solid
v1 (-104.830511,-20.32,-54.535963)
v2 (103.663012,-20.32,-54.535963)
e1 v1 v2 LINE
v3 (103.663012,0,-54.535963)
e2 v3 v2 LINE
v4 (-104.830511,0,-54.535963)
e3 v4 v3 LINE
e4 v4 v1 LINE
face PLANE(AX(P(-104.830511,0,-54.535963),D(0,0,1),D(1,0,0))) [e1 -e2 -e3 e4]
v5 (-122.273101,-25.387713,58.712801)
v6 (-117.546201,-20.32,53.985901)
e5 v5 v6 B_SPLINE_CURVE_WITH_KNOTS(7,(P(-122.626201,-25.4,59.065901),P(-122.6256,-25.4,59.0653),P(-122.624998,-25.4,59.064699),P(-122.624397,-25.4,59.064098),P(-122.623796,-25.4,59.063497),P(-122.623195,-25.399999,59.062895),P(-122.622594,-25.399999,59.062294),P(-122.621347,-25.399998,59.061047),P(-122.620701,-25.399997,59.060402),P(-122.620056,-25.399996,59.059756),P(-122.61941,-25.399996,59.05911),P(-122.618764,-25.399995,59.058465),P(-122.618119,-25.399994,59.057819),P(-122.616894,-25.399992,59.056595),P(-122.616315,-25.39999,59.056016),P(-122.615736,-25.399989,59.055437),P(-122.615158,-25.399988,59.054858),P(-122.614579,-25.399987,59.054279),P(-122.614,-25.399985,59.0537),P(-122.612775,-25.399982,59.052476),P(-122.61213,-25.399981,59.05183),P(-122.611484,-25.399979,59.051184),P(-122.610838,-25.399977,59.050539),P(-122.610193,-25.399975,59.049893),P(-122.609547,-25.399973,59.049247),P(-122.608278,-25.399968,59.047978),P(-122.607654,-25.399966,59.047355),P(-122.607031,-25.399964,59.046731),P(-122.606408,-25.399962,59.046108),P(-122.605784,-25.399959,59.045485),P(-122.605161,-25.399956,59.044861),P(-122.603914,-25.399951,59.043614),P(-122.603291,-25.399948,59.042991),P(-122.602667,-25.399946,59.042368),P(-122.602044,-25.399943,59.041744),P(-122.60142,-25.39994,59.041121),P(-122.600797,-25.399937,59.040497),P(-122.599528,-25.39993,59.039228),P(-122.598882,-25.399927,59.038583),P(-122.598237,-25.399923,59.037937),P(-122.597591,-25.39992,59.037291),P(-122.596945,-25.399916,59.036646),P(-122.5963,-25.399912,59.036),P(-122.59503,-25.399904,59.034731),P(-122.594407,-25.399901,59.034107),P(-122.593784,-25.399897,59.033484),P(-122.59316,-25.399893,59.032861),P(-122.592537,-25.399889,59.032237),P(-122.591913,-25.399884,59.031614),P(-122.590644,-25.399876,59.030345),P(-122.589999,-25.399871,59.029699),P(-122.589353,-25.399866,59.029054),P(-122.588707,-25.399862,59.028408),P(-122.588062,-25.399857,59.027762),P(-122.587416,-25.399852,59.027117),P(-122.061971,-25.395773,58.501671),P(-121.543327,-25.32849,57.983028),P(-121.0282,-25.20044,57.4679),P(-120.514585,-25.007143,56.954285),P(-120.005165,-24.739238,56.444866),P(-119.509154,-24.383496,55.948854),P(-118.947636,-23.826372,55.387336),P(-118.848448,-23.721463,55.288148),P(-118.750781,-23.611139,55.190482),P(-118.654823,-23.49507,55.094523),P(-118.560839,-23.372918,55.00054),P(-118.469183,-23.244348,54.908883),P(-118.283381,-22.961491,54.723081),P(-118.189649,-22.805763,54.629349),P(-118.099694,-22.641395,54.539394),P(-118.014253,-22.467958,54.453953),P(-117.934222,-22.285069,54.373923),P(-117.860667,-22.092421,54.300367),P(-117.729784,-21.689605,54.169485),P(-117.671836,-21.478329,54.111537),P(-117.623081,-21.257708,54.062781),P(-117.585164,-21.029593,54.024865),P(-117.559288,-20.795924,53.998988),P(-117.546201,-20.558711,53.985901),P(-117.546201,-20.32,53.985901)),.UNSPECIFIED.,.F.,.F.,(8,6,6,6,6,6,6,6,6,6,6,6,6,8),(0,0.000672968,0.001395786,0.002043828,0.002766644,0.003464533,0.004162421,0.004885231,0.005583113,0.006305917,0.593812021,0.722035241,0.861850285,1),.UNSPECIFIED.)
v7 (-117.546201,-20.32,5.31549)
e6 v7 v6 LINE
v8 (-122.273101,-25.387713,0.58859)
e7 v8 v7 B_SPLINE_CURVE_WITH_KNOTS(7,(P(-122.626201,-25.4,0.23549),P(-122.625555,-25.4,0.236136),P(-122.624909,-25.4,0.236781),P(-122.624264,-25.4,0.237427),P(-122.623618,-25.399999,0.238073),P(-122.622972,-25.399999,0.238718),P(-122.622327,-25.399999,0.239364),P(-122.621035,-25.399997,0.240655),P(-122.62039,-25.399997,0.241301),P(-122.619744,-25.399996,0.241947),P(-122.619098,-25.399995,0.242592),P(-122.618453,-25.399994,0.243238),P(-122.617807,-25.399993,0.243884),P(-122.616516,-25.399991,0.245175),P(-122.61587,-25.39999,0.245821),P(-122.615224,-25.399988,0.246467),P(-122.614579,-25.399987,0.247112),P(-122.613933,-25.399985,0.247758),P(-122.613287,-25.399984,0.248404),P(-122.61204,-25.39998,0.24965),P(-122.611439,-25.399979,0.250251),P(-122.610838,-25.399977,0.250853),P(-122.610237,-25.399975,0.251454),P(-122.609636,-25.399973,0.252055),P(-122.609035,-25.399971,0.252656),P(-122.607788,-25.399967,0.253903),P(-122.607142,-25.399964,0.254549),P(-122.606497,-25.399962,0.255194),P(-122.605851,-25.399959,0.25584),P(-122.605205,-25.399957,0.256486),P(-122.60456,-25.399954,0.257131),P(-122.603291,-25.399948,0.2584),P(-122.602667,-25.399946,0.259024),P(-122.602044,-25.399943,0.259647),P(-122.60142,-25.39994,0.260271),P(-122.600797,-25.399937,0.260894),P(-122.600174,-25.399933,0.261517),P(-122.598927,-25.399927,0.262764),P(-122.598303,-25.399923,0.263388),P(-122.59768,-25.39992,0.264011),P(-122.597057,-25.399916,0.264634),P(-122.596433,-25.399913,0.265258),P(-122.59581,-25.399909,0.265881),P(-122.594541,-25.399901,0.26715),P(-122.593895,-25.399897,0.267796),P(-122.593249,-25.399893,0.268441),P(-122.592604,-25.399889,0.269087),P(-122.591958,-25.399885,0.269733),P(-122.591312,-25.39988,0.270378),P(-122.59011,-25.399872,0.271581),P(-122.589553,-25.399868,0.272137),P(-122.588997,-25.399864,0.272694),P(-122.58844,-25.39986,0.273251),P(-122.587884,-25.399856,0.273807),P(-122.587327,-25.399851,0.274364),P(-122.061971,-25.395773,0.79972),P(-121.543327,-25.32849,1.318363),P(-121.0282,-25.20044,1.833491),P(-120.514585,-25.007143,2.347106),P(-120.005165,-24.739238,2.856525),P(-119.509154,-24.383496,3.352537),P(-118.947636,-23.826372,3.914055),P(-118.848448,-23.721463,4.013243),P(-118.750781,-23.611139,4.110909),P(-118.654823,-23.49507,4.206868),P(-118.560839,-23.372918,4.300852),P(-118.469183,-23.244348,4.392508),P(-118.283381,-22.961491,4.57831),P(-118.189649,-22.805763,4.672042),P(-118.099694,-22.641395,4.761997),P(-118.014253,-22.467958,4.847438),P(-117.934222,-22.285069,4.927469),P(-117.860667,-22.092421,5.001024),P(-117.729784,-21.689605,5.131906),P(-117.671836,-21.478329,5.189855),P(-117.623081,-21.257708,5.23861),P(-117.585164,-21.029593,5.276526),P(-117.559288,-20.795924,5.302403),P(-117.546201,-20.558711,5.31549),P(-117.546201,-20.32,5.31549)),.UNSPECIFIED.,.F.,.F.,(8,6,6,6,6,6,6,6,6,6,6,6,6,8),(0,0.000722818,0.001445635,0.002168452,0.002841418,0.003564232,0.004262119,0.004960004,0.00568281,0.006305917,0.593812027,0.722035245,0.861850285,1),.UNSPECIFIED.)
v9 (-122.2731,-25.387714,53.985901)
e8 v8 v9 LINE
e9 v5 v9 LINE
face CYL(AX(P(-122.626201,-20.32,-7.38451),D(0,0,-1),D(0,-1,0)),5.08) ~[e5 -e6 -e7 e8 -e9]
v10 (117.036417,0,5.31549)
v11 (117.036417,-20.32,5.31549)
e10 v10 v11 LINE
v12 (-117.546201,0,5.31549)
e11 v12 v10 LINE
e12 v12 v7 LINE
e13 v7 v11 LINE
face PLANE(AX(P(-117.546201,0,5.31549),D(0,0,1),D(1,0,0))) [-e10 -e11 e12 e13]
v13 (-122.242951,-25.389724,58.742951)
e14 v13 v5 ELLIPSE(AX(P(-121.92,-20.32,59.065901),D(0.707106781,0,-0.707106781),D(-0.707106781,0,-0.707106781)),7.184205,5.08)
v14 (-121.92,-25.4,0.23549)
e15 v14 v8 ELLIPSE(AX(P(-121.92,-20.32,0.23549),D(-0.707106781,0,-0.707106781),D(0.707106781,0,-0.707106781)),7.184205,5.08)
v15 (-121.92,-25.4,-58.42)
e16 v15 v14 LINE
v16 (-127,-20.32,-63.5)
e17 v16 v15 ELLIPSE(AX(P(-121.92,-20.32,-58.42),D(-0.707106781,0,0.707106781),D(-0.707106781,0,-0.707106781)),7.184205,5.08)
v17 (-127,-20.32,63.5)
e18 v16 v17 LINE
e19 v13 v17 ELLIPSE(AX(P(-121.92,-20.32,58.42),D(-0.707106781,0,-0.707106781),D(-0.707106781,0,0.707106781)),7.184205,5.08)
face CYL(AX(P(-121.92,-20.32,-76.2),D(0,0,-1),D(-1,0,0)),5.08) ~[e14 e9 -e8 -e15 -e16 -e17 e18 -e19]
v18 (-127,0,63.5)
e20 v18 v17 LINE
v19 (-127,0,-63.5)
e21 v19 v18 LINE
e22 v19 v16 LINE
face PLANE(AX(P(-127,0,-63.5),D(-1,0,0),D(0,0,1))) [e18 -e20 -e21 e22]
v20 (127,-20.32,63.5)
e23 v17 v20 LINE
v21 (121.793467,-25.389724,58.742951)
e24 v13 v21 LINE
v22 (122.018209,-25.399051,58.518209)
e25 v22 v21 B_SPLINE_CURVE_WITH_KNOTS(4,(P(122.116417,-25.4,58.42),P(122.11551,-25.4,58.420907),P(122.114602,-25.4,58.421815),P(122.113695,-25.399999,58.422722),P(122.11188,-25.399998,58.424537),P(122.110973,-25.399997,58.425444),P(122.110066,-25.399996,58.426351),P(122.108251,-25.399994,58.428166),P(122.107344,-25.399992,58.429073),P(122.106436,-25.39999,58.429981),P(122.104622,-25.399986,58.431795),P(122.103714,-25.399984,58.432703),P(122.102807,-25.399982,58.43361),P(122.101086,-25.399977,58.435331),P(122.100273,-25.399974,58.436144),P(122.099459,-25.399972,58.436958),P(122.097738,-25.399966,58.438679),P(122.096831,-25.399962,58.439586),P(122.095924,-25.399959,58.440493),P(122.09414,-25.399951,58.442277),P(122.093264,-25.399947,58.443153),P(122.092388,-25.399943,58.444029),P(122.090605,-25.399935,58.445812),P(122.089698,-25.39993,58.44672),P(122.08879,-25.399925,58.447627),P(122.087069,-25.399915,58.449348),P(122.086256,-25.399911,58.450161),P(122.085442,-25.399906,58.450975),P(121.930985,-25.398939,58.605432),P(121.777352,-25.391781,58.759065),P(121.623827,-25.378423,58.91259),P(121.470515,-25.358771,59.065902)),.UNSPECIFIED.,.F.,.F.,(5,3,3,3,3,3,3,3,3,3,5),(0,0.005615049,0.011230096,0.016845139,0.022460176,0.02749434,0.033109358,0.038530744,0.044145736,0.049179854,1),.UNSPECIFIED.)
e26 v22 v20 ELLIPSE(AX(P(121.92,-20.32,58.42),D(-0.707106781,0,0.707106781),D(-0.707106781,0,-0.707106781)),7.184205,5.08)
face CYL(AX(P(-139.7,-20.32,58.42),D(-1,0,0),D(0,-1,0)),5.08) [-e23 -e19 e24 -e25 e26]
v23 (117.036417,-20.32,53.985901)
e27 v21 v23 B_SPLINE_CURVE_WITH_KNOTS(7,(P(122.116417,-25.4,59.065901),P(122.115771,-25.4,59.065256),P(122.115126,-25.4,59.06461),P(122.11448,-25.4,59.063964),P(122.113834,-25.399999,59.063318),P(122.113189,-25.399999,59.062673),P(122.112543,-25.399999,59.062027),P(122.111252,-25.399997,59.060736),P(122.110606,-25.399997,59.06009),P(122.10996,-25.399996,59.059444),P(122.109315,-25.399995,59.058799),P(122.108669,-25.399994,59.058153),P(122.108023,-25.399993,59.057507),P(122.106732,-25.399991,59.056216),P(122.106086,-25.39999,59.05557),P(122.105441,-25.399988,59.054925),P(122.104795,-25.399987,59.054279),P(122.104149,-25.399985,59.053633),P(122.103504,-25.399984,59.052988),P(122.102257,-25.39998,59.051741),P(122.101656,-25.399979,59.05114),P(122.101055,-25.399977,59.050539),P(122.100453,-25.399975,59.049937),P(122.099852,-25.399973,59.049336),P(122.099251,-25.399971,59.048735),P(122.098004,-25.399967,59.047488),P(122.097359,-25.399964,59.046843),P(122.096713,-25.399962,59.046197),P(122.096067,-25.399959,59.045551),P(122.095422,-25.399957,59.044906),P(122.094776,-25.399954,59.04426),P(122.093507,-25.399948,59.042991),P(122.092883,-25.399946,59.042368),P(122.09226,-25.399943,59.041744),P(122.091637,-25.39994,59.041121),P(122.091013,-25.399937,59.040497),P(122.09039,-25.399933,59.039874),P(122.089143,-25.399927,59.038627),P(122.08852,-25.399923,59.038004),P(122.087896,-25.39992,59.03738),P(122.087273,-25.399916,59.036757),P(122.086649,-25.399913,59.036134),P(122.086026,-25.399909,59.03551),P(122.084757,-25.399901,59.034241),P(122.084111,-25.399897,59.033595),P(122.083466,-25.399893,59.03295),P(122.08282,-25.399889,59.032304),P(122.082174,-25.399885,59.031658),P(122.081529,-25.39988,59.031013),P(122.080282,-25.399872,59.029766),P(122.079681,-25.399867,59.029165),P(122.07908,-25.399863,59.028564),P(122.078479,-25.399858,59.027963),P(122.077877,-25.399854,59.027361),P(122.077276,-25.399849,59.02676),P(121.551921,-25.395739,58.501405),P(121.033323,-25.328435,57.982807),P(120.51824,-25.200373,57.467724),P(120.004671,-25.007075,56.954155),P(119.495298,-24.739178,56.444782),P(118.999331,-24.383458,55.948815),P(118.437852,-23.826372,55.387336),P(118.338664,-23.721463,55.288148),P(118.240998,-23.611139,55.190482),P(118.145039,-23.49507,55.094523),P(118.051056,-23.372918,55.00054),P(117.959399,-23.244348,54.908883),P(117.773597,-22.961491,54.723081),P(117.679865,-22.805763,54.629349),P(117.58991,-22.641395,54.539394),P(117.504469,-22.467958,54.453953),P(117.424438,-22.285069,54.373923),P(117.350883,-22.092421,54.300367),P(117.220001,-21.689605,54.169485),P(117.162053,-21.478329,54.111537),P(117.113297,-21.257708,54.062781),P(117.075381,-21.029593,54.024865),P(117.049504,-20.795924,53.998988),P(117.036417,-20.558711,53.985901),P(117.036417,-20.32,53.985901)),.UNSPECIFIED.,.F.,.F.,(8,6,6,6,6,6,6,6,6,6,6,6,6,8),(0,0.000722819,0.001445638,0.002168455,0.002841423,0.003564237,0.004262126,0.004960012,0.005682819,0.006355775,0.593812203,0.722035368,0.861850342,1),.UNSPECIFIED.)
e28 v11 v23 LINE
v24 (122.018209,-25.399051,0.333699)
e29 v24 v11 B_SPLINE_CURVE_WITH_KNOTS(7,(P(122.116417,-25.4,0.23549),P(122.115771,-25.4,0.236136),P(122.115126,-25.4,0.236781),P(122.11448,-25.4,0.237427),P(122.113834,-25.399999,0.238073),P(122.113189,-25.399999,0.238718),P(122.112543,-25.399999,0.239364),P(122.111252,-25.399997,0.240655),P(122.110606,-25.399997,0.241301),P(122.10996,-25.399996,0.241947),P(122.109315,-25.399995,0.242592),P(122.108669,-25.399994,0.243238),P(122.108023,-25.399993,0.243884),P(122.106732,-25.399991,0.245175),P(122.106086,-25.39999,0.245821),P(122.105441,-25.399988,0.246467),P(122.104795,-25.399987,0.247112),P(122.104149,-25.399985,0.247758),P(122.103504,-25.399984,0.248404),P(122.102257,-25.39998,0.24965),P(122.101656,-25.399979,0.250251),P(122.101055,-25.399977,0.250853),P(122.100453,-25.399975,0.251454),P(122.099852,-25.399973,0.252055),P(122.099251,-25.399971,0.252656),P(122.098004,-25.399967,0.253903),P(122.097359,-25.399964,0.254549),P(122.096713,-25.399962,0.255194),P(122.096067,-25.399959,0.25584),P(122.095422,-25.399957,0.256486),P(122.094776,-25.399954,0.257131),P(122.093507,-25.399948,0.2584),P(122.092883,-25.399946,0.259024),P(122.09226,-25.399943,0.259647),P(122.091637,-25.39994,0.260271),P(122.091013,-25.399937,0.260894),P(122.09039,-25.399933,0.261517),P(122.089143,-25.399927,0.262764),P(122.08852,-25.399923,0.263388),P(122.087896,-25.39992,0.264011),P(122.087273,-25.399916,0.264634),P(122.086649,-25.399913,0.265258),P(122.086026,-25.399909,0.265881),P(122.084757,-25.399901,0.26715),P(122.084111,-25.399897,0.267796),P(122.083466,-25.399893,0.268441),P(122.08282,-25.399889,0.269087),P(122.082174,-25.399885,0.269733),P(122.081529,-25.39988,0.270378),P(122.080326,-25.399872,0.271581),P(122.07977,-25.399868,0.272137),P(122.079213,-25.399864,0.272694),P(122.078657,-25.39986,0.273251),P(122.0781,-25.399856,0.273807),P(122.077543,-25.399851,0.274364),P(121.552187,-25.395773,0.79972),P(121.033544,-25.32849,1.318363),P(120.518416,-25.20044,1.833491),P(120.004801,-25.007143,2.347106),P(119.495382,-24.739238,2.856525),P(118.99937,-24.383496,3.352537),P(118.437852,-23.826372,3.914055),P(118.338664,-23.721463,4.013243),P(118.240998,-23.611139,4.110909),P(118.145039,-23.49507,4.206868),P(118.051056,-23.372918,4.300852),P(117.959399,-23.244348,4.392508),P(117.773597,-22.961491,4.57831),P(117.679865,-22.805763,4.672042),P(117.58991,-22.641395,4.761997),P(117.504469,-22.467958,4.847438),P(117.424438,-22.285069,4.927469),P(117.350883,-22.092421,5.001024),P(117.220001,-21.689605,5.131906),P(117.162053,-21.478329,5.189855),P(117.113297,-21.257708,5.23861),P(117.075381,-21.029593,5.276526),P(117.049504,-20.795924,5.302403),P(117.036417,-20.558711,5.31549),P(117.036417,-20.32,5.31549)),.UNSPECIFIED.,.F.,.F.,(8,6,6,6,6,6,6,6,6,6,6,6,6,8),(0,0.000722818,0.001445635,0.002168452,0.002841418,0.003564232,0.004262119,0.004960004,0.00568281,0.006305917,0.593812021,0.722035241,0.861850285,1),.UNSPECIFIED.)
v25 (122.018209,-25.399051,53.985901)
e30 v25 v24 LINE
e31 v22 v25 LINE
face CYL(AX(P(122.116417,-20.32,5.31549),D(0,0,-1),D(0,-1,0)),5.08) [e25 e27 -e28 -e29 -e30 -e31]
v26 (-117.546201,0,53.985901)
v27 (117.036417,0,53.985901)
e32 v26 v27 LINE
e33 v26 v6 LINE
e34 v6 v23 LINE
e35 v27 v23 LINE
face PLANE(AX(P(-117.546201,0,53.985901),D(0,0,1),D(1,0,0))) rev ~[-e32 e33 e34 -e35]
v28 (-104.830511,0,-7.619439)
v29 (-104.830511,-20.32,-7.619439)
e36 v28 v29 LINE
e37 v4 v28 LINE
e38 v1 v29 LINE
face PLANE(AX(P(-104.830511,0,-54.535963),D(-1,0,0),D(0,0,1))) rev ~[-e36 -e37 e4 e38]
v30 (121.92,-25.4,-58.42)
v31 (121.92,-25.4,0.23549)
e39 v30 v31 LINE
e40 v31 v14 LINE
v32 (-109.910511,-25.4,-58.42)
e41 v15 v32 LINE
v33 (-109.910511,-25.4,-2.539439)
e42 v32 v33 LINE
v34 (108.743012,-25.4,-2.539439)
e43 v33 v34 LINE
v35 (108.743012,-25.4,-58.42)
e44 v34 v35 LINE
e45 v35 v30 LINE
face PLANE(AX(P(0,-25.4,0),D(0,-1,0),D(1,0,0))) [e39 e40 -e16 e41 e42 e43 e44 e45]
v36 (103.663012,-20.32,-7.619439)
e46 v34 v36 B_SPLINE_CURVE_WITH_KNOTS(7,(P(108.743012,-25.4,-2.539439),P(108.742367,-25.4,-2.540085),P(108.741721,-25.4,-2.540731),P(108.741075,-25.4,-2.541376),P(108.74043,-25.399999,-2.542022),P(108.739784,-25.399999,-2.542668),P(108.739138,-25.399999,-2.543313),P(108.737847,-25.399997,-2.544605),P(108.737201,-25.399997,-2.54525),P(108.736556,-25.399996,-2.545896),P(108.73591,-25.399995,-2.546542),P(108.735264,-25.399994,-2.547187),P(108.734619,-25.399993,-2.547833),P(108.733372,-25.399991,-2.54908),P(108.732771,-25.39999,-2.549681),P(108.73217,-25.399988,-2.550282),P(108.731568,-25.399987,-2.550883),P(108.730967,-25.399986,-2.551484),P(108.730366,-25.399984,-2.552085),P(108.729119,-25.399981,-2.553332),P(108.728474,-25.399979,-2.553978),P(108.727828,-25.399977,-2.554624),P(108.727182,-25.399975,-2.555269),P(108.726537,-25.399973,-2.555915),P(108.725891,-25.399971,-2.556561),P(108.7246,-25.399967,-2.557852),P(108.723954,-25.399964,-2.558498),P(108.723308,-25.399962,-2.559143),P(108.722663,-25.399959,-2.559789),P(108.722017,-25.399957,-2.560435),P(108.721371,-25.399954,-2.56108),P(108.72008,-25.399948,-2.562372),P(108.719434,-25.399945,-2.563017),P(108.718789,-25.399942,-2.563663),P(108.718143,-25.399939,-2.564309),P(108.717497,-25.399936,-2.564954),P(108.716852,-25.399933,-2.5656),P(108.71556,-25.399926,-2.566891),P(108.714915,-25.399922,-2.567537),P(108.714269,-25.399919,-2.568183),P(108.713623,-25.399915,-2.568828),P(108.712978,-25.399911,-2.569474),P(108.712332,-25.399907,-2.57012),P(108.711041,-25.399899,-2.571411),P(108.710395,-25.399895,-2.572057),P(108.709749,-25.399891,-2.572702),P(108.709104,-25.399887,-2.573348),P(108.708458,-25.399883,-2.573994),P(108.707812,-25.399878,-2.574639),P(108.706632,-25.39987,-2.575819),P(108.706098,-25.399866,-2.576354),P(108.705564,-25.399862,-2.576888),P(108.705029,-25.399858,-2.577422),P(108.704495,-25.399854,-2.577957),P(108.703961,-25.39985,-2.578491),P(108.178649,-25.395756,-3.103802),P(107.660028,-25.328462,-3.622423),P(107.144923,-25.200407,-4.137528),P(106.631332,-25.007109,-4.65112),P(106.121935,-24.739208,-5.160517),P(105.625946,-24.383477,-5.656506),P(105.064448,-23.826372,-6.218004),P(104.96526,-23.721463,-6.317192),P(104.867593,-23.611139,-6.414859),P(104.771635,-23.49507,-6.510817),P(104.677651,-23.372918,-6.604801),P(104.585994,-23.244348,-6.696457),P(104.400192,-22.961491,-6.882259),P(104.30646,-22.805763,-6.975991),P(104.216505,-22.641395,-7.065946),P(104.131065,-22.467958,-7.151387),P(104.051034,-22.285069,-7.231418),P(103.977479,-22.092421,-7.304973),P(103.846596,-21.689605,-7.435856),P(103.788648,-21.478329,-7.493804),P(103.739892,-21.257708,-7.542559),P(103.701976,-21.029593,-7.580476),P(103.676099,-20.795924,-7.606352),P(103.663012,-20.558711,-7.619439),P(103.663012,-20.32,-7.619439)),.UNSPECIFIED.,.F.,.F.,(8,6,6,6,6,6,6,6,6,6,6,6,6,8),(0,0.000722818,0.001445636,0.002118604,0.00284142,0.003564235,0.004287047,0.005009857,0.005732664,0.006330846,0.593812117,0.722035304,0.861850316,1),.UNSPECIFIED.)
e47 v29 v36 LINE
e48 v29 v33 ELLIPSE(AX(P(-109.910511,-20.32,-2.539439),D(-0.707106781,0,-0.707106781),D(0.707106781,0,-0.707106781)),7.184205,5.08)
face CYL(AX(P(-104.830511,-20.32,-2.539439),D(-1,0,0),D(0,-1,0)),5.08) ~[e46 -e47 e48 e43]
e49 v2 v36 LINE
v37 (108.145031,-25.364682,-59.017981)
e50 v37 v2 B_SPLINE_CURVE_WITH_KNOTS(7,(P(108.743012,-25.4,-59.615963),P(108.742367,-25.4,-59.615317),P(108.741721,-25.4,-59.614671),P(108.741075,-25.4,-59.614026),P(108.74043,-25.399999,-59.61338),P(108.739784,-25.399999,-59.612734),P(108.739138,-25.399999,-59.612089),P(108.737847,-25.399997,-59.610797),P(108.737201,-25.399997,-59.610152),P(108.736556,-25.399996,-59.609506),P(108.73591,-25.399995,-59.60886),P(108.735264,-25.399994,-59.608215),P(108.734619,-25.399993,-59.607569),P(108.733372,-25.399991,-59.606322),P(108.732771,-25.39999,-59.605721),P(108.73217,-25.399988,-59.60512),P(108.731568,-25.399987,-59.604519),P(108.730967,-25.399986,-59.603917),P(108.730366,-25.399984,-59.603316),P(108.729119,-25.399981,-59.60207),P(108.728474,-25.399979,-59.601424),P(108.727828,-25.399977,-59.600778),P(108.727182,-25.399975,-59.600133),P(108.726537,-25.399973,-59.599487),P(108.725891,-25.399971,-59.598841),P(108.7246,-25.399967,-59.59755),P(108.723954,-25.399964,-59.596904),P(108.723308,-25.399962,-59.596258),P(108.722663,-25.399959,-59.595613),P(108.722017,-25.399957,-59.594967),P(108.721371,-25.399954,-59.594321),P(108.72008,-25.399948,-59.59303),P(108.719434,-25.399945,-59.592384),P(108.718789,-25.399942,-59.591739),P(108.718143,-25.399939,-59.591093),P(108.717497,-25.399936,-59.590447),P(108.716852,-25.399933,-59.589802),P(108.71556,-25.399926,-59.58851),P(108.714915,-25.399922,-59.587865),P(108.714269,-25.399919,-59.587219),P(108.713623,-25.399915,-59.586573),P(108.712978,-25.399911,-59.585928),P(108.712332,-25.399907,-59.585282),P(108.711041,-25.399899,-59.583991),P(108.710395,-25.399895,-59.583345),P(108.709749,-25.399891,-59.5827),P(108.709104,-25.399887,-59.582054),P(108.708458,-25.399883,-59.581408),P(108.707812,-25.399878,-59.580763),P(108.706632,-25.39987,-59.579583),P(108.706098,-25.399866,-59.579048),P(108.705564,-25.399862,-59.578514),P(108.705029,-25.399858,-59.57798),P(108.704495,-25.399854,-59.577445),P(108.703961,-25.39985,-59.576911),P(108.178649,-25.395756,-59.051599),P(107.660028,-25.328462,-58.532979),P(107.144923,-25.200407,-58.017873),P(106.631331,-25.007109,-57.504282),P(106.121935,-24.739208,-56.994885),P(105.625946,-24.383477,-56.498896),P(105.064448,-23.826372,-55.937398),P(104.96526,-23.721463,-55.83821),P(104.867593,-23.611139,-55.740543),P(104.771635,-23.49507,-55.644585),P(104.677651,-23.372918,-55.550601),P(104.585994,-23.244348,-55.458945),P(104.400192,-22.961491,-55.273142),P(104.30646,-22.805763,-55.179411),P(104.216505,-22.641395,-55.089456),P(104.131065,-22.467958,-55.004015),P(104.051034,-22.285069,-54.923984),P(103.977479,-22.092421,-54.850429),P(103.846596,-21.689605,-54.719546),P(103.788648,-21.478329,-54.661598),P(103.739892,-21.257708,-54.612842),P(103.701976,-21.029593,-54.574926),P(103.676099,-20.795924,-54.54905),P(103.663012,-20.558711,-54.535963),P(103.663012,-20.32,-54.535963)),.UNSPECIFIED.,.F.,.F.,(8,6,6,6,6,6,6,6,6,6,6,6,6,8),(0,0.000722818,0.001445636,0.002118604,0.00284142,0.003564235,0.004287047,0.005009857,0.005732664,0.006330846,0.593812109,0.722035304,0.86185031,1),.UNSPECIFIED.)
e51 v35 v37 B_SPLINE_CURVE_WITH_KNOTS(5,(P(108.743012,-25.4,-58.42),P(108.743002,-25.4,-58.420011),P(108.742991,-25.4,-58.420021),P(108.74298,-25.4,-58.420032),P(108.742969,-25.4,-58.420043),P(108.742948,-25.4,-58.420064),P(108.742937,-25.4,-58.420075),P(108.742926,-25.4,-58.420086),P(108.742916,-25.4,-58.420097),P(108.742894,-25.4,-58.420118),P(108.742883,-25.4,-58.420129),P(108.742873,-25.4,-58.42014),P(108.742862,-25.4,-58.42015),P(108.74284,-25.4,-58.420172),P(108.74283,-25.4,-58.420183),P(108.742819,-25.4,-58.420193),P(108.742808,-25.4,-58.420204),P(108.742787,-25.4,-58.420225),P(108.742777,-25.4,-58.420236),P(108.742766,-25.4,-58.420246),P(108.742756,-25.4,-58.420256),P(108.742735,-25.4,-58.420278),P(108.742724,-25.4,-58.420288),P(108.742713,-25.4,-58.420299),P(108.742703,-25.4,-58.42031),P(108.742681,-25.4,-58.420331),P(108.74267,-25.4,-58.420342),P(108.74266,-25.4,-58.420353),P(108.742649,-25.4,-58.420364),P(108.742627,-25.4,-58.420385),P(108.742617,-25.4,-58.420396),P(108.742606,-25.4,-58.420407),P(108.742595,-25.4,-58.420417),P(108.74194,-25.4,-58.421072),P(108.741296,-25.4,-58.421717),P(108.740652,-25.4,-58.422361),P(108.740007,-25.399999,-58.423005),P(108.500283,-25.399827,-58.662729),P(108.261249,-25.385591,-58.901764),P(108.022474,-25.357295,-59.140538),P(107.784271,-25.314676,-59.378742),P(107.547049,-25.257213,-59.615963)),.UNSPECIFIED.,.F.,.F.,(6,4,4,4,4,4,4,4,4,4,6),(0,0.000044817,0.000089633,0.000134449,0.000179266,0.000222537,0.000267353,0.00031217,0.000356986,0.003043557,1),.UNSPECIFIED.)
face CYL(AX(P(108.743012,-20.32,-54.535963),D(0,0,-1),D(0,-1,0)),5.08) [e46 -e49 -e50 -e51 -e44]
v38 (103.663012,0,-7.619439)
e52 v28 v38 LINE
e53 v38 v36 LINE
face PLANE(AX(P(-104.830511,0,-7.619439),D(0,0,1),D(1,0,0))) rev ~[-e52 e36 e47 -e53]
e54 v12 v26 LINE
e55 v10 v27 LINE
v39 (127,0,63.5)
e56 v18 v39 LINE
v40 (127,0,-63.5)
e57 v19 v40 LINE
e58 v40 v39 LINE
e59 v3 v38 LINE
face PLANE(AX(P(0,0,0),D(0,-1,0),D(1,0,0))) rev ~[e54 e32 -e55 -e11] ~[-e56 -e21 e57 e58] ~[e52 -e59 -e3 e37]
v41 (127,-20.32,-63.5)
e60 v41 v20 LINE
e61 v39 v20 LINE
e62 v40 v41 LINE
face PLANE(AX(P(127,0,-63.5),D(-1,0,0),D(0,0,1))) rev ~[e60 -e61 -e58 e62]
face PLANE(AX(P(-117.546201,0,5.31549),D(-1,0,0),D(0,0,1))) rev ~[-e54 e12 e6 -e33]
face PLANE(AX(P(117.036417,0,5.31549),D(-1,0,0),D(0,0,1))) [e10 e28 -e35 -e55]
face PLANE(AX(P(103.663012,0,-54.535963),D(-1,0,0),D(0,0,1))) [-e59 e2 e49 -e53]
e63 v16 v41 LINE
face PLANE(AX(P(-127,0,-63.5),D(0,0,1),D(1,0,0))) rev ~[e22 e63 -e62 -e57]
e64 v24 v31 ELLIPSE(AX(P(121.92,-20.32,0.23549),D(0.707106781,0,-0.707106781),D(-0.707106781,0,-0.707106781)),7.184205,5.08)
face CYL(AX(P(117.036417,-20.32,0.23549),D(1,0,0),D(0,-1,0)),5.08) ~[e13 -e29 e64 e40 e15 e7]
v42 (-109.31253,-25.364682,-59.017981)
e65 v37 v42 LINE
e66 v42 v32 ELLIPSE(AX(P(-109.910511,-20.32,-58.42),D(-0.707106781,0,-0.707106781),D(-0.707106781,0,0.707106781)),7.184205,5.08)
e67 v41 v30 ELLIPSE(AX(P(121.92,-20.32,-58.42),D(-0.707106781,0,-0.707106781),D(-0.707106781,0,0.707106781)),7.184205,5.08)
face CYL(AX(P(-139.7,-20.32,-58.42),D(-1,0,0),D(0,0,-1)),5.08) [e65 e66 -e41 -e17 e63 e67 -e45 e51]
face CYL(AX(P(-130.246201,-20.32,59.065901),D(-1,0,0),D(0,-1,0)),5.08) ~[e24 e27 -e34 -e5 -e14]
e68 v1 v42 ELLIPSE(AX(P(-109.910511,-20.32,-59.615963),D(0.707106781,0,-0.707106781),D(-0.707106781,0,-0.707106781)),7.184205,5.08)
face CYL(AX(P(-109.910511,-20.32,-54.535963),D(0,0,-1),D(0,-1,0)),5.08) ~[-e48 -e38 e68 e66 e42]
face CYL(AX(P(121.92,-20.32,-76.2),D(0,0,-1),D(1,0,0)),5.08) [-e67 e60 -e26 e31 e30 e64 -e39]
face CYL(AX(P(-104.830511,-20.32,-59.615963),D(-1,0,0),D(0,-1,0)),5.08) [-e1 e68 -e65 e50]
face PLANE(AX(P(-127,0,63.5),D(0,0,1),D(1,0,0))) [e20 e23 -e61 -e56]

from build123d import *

# Parameters (mm, degrees)
F0_W         = 254
F0_H         = 127
F2_DEPTH     = 25.4
F1_W         = 234.5826178789
F1_H         = 48.6704111099
F1_W_2       = 208.4935232997
F1_H_2       = 46.9165234827
F3_DEPTH     = 50.8
F4_DEPTH     = 102.87
F5_T1_DEPTH  = 279.4
F5_T3_DEPTH  = 152.4
F5_T5_DEPTH  = 46.9165234827
F5_T7_DEPTH  = 208.4935232997
F5_T9_DEPTH  = 48.6704111099
F5_T11_DEPTH = 234.5826178789
F5_T17_DEPTH = 59.6165234827
F5_T21_DEPTH = 221.1935232997
F5_T28_DEPTH = 59.6165234827
F5_T32_DEPTH = 221.1935232997
F5_T39_DEPTH = 221.1935232997
F5_T43_DEPTH = 59.6165234827
F5_T50_DEPTH = 59.6165234827
F5_T54_DEPTH = 221.1935232997
F5_T61_DEPTH = 61.3704111099
F5_T65_DEPTH = 247.2826178789
F5_T72_DEPTH = 61.3704111099
F5_T76_DEPTH = 247.2826178789
F5_T83_DEPTH = 247.2826178789
F5_T87_DEPTH = 61.3704111099
F5_T94_DEPTH = 61.3704111099
F5_T98_DEPTH = 247.2826178789


# Not quite as in the source:
# - a fillet or chamfer that OpenCascade refuses, or shapes differently, is made with other operations: its cross-section is extruded or revolved along the edge and cut away or added


with BuildPart() as f2:
    # F0 (on Front) → F2 (new body)
    with BuildSketch(Plane.XZ):
        Rectangle(F0_W, F0_H)
    extrude(amount=F2_DEPTH)

    # F1 (on face) → F3 (cut)
    with BuildSketch(Plane.XZ):
        with Locations((-0.2548918128, 29.650695622)):
            Rectangle(F1_W, F1_H)
        with Locations((-0.5837492645, -31.0777008999)):
            Rectangle(F1_W_2, F1_H_2)
    extrude(amount=-F3_DEPTH, mode=Mode.SUBTRACT)

    # F1 (on face) → F4 (cut)
    with BuildSketch(Plane.XZ):
        with Locations((-0.2548918128, 29.650695622)):
            Rectangle(F1_W, F1_H)
        with Locations((-0.5837492645, -31.0777008999)):
            Rectangle(F1_W_2, F1_H_2)
    extrude(amount=F4_DEPTH, mode=Mode.SUBTRACT)

    # F5: fillet of radius 5.08 on 12 edges, made by hand

    # F5_s2 → F5_t1 (cut)
    with BuildSketch(Plane.YZ.offset(-139.7)):
        with BuildLine():
            ThreePointArc((-20.32, -63.5), (-23.9121024484, -62.0121024484), (-25.4, -58.42))
            Line((-25.4, -58.42), (-25.4, -63.5))
            Line((-25.4, -63.5), (-20.32, -63.5))
        make_face()
        with BuildLine():
            ThreePointArc((-25.4, 58.42), (-23.9121024484, 62.0121024484), (-20.32, 63.5))
            Line((-20.32, 63.5), (-25.4, 63.5))
            Line((-25.4, 63.5), (-25.4, 58.42))
        make_face()
    extrude(amount=F5_T1_DEPTH, mode=Mode.SUBTRACT)

    # F5_s4 → F5_t3 (cut)
    with BuildSketch(Plane.XY.offset(-76.2)):
        with BuildLine():
            ThreePointArc((-127, -20.32), (-125.5121024484, -23.9121024484), (-121.92, -25.4))
            Line((-121.92, -25.4), (-127, -25.4))
            Line((-127, -25.4), (-127, -20.32))
        make_face()
        with BuildLine():
            ThreePointArc((127, -20.32), (125.5121024484, -23.9121024484), (121.92, -25.4))
            Line((121.92, -25.4), (127, -25.4))
            Line((127, -25.4), (127, -20.32))
        make_face()
    extrude(amount=F5_T3_DEPTH, mode=Mode.SUBTRACT)

    # F5_s6 → F5_t5 (cut)
    with BuildSketch(Plane.XY.offset(-54.5359626412)):
        with BuildLine():
            ThreePointArc((-109.9105109143, -25.4), (-106.3184084659, -23.9121024484), (-104.8305109143, -20.32))
            Line((-104.8305109143, -20.32), (-104.8305109143, -25.4))
            Line((-104.8305109143, -25.4), (-109.9105109143, -25.4))
        make_face()
        with BuildLine():
            ThreePointArc((108.7430123854, -25.4), (105.1509099369, -23.9121024484), (103.6630123854, -20.32))
            Line((103.6630123854, -20.32), (103.6630123854, -25.4))
            Line((103.6630123854, -25.4), (108.7430123854, -25.4))
        make_face()
    extrude(amount=F5_T5_DEPTH, mode=Mode.SUBTRACT)

    # F5_s8 → F5_t7 (cut)
    with BuildSketch(Plane.YZ.offset(-104.8305109143)):
        with BuildLine():
            ThreePointArc((-25.4, -59.6159626412), (-23.9121024484, -56.0238601928), (-20.32, -54.5359626412))
            Line((-20.32, -54.5359626412), (-25.4, -54.5359626412))
            Line((-25.4, -54.5359626412), (-25.4, -59.6159626412))
        make_face()
        with BuildLine():
            ThreePointArc((-25.4, -2.5394391586), (-23.9121024484, -6.131541607), (-20.32, -7.6194391586))
            Line((-20.32, -7.6194391586), (-25.4, -7.6194391586))
            Line((-25.4, -7.6194391586), (-25.4, -2.5394391586))
        make_face()
    extrude(amount=F5_T7_DEPTH, mode=Mode.SUBTRACT)

    # F5_s10 → F5_t9 (cut)
    with BuildSketch(Plane.XY.offset(5.315490067)):
        with BuildLine():
            ThreePointArc((-122.6262007523, -25.4), (-119.0340983038, -23.9121024484), (-117.5462007523, -20.32))
            Line((-117.5462007523, -20.32), (-117.5462007523, -25.4))
            Line((-117.5462007523, -25.4), (-122.6262007523, -25.4))
        make_face()
        with BuildLine():
            ThreePointArc((122.1164171267, -25.4), (118.5243146782, -23.9121024484), (117.0364171267, -20.32))
            Line((117.0364171267, -20.32), (117.0364171267, -25.4))
            Line((117.0364171267, -25.4), (122.1164171267, -25.4))
        make_face()
    extrude(amount=F5_T9_DEPTH, mode=Mode.SUBTRACT)

    # F5_s12 → F5_t11 (cut)
    with BuildSketch(Plane.YZ.offset(-117.5462007523)):
        with BuildLine():
            ThreePointArc((-25.4, 0.235490067), (-23.9121024484, 3.8275925154), (-20.32, 5.315490067))
            Line((-20.32, 5.315490067), (-25.4, 5.315490067))
            Line((-25.4, 5.315490067), (-25.4, 0.235490067))
        make_face()
        with BuildLine():
            ThreePointArc((-25.4, 59.0659011769), (-23.9121024484, 55.4737987285), (-20.32, 53.9859011769))
            Line((-20.32, 53.9859011769), (-25.4, 53.9859011769))
            Line((-25.4, 53.9859011769), (-25.4, 59.0659011769))
        make_face()
    extrude(amount=F5_T11_DEPTH, mode=Mode.SUBTRACT)


with BuildPart() as f5_tool15:
    # F5_s16 → F5_t17 (new body)
    with BuildSketch(Plane.XY.offset(-67.2359626412)):
        with BuildLine():
            ThreePointArc((-109.9105109143, -25.4), (-106.3184084659, -23.9121024484), (-104.8305109143, -20.32))
            Line((-104.8305109143, -20.32), (-104.8305109143, -25.4))
            Line((-104.8305109143, -25.4), (-109.9105109143, -25.4))
        make_face()
    extrude(amount=F5_T17_DEPTH)

    split(bisect_by=Plane.XY.offset(-54.5359626412), keep=Keep.BOTTOM)


with BuildPart() as f5_tool19:
    # F5_s20 → F5_t21 (new body)
    with BuildSketch(Plane.YZ.offset(103.6630123854)):
        with BuildLine():
            ThreePointArc((-25.4, -59.6159626412), (-23.9121024484, -56.0238601928), (-20.32, -54.5359626412))
            Line((-20.32, -54.5359626412), (-25.4, -54.5359626412))
            Line((-25.4, -54.5359626412), (-25.4, -59.6159626412))
        make_face()
    extrude(amount=-F5_T21_DEPTH)

    split(bisect_by=Plane.YZ.offset(-104.8305109143), keep=Keep.BOTTOM)


with BuildPart() as f5_tool15_1:
    add(f5_tool15.part)

    # F5_t23: intersect F5_tool19
    add(f5_tool19.part, mode=Mode.INTERSECT)


with BuildPart() as f2_1:
    add(f2.part)

    # F5_t13: cut F5_tool15
    add(f5_tool15_1.part, mode=Mode.SUBTRACT)


with BuildPart() as f5_tool26:
    # F5_s27 → F5_t28 (new body)
    with BuildSketch(Plane.XY.offset(-54.5359626412)):
        with BuildLine():
            ThreePointArc((-109.9105109143, -25.4), (-106.3184084659, -23.9121024484), (-104.8305109143, -20.32))
            Line((-104.8305109143, -20.32), (-104.8305109143, -25.4))
            Line((-104.8305109143, -25.4), (-109.9105109143, -25.4))
        make_face()
    extrude(amount=F5_T28_DEPTH)

    split(bisect_by=Plane.XY.offset(-7.6194391586), keep=Keep.TOP)


with BuildPart() as f5_tool30:
    # F5_s31 → F5_t32 (new body)
    with BuildSketch(Plane.YZ.offset(-117.5305109143)):
        with BuildLine():
            ThreePointArc((-25.4, -2.5394391586), (-23.9121024484, -6.131541607), (-20.32, -7.6194391586))
            Line((-20.32, -7.6194391586), (-25.4, -7.6194391586))
            Line((-25.4, -7.6194391586), (-25.4, -2.5394391586))
        make_face()
    extrude(amount=F5_T32_DEPTH)

    split(bisect_by=Plane.YZ.offset(-104.8305109143), keep=Keep.BOTTOM)


with BuildPart() as f5_tool26_1:
    add(f5_tool26.part)

    # F5_t34: intersect F5_tool30
    add(f5_tool30.part, mode=Mode.INTERSECT)


with BuildPart() as f2_2:
    add(f2_1.part)

    # F5_t24: cut F5_tool26
    add(f5_tool26_1.part, mode=Mode.SUBTRACT)


with BuildPart() as f5_tool37:
    # F5_s38 → F5_t39 (new body)
    with BuildSketch(Plane.YZ.offset(116.3630123854)):
        with BuildLine():
            ThreePointArc((-25.4, -59.6159626412), (-23.9121024484, -56.0238601928), (-20.32, -54.5359626412))
            Line((-20.32, -54.5359626412), (-25.4, -54.5359626412))
            Line((-25.4, -54.5359626412), (-25.4, -59.6159626412))
        make_face()
    extrude(amount=-F5_T39_DEPTH)

    split(bisect_by=Plane.YZ.offset(103.6630123854), keep=Keep.TOP)


with BuildPart() as f5_tool41:
    # F5_s42 → F5_t43 (new body)
    with BuildSketch(Plane.XY.offset(-7.6194391586)):
        with BuildLine():
            ThreePointArc((108.7430123854, -25.4), (105.1509099369, -23.9121024484), (103.6630123854, -20.32))
            Line((103.6630123854, -20.32), (103.6630123854, -25.4))
            Line((103.6630123854, -25.4), (108.7430123854, -25.4))
        make_face()
    extrude(amount=-F5_T43_DEPTH)

    split(bisect_by=Plane.XY.offset(-54.5359626412), keep=Keep.BOTTOM)


with BuildPart() as f5_tool37_1:
    add(f5_tool37.part)

    # F5_t45: intersect F5_tool41
    add(f5_tool41.part, mode=Mode.INTERSECT)


with BuildPart() as f2_3:
    add(f2_2.part)

    # F5_t35: cut F5_tool37
    add(f5_tool37_1.part, mode=Mode.SUBTRACT)


with BuildPart() as f5_tool48:
    # F5_s49 → F5_t50 (new body)
    with BuildSketch(Plane.XY.offset(5.0805608414)):
        with BuildLine():
            ThreePointArc((108.7430123854, -25.4), (105.1509099369, -23.9121024484), (103.6630123854, -20.32))
            Line((103.6630123854, -20.32), (103.6630123854, -25.4))
            Line((103.6630123854, -25.4), (108.7430123854, -25.4))
        make_face()
    extrude(amount=-F5_T50_DEPTH)

    split(bisect_by=Plane.XY.offset(-7.6194391586), keep=Keep.TOP)


with BuildPart() as f5_tool52:
    # F5_s53 → F5_t54 (new body)
    with BuildSketch(Plane.YZ.offset(-104.8305109143)):
        with BuildLine():
            ThreePointArc((-25.4, -2.5394391586), (-23.9121024484, -6.131541607), (-20.32, -7.6194391586))
            Line((-20.32, -7.6194391586), (-25.4, -7.6194391586))
            Line((-25.4, -7.6194391586), (-25.4, -2.5394391586))
        make_face()
    extrude(amount=F5_T54_DEPTH)

    split(bisect_by=Plane.YZ.offset(103.6630123854), keep=Keep.TOP)


with BuildPart() as f5_tool48_1:
    add(f5_tool48.part)

    # F5_t56: intersect F5_tool52
    add(f5_tool52.part, mode=Mode.INTERSECT)


with BuildPart() as f2_4:
    add(f2_3.part)

    # F5_t46: cut F5_tool48
    add(f5_tool48_1.part, mode=Mode.SUBTRACT)


with BuildPart() as f5_tool59:
    # F5_s60 → F5_t61 (new body)
    with BuildSketch(Plane.XY.offset(-7.384509933)):
        with BuildLine():
            ThreePointArc((-122.6262007523, -25.4), (-119.0340983038, -23.9121024484), (-117.5462007523, -20.32))
            Line((-117.5462007523, -20.32), (-117.5462007523, -25.4))
            Line((-117.5462007523, -25.4), (-122.6262007523, -25.4))
        make_face()
    extrude(amount=F5_T61_DEPTH)

    split(bisect_by=Plane.XY.offset(5.315490067), keep=Keep.BOTTOM)


with BuildPart() as f5_tool63:
    # F5_s64 → F5_t65 (new body)
    with BuildSketch(Plane.YZ.offset(117.0364171267)):
        with BuildLine():
            ThreePointArc((-25.4, 0.235490067), (-23.9121024484, 3.8275925154), (-20.32, 5.315490067))
            Line((-20.32, 5.315490067), (-25.4, 5.315490067))
            Line((-25.4, 5.315490067), (-25.4, 0.235490067))
        make_face()
    extrude(amount=-F5_T65_DEPTH)

    split(bisect_by=Plane.YZ.offset(-117.5462007523), keep=Keep.BOTTOM)


with BuildPart() as f5_tool59_1:
    add(f5_tool59.part)

    # F5_t67: intersect F5_tool63
    add(f5_tool63.part, mode=Mode.INTERSECT)


with BuildPart() as f2_5:
    add(f2_4.part)

    # F5_t57: cut F5_tool59
    add(f5_tool59_1.part, mode=Mode.SUBTRACT)


with BuildPart() as f5_tool70:
    # F5_s71 → F5_t72 (new body)
    with BuildSketch(Plane.XY.offset(5.315490067)):
        with BuildLine():
            ThreePointArc((-122.6262007523, -25.4), (-119.0340983038, -23.9121024484), (-117.5462007523, -20.32))
            Line((-117.5462007523, -20.32), (-117.5462007523, -25.4))
            Line((-117.5462007523, -25.4), (-122.6262007523, -25.4))
        make_face()
    extrude(amount=F5_T72_DEPTH)

    split(bisect_by=Plane.XY.offset(53.9859011769), keep=Keep.TOP)


with BuildPart() as f5_tool74:
    # F5_s75 → F5_t76 (new body)
    with BuildSketch(Plane.YZ.offset(-130.2462007523)):
        with BuildLine():
            ThreePointArc((-25.4, 59.0659011769), (-23.9121024484, 55.4737987285), (-20.32, 53.9859011769))
            Line((-20.32, 53.9859011769), (-25.4, 53.9859011769))
            Line((-25.4, 53.9859011769), (-25.4, 59.0659011769))
        make_face()
    extrude(amount=F5_T76_DEPTH)

    split(bisect_by=Plane.YZ.offset(-117.5462007523), keep=Keep.BOTTOM)


with BuildPart() as f5_tool70_1:
    add(f5_tool70.part)

    # F5_t78: intersect F5_tool74
    add(f5_tool74.part, mode=Mode.INTERSECT)


with BuildPart() as f2_6:
    add(f2_5.part)

    # F5_t68: cut F5_tool70
    add(f5_tool70_1.part, mode=Mode.SUBTRACT)


with BuildPart() as f5_tool81:
    # F5_s82 → F5_t83 (new body)
    with BuildSketch(Plane.YZ.offset(129.7364171267)):
        with BuildLine():
            ThreePointArc((-25.4, 0.235490067), (-23.9121024484, 3.8275925154), (-20.32, 5.315490067))
            Line((-20.32, 5.315490067), (-25.4, 5.315490067))
            Line((-25.4, 5.315490067), (-25.4, 0.235490067))
        make_face()
    extrude(amount=-F5_T83_DEPTH)

    split(bisect_by=Plane.YZ.offset(117.0364171267), keep=Keep.TOP)


with BuildPart() as f5_tool85:
    # F5_s86 → F5_t87 (new body)
    with BuildSketch(Plane.XY.offset(53.9859011769)):
        with BuildLine():
            ThreePointArc((122.1164171267, -25.4), (118.5243146782, -23.9121024484), (117.0364171267, -20.32))
            Line((117.0364171267, -20.32), (117.0364171267, -25.4))
            Line((117.0364171267, -25.4), (122.1164171267, -25.4))
        make_face()
    extrude(amount=-F5_T87_DEPTH)

    split(bisect_by=Plane.XY.offset(5.315490067), keep=Keep.BOTTOM)


with BuildPart() as f5_tool81_1:
    add(f5_tool81.part)

    # F5_t89: intersect F5_tool85
    add(f5_tool85.part, mode=Mode.INTERSECT)


with BuildPart() as f2_7:
    add(f2_6.part)

    # F5_t79: cut F5_tool81
    add(f5_tool81_1.part, mode=Mode.SUBTRACT)


with BuildPart() as f5_tool92:
    # F5_s93 → F5_t94 (new body)
    with BuildSketch(Plane.XY.offset(66.6859011769)):
        with BuildLine():
            ThreePointArc((122.1164171267, -25.4), (118.5243146782, -23.9121024484), (117.0364171267, -20.32))
            Line((117.0364171267, -20.32), (117.0364171267, -25.4))
            Line((117.0364171267, -25.4), (122.1164171267, -25.4))
        make_face()
    extrude(amount=-F5_T94_DEPTH)

    split(bisect_by=Plane.XY.offset(53.9859011769), keep=Keep.TOP)


with BuildPart() as f5_tool96:
    # F5_s97 → F5_t98 (new body)
    with BuildSketch(Plane.YZ.offset(-117.5462007523)):
        with BuildLine():
            ThreePointArc((-25.4, 59.0659011769), (-23.9121024484, 55.4737987285), (-20.32, 53.9859011769))
            Line((-20.32, 53.9859011769), (-25.4, 53.9859011769))
            Line((-25.4, 53.9859011769), (-25.4, 59.0659011769))
        make_face()
    extrude(amount=F5_T98_DEPTH)

    split(bisect_by=Plane.YZ.offset(117.0364171267), keep=Keep.TOP)


with BuildPart() as f5_tool92_1:
    add(f5_tool92.part)

    # F5_t100: intersect F5_tool96
    add(f5_tool96.part, mode=Mode.INTERSECT)


with BuildPart() as f2_8:
    add(f2_7.part)

    # F5_t90: cut F5_tool92
    add(f5_tool92_1.part, mode=Mode.SUBTRACT)


solid = f2_8.part
